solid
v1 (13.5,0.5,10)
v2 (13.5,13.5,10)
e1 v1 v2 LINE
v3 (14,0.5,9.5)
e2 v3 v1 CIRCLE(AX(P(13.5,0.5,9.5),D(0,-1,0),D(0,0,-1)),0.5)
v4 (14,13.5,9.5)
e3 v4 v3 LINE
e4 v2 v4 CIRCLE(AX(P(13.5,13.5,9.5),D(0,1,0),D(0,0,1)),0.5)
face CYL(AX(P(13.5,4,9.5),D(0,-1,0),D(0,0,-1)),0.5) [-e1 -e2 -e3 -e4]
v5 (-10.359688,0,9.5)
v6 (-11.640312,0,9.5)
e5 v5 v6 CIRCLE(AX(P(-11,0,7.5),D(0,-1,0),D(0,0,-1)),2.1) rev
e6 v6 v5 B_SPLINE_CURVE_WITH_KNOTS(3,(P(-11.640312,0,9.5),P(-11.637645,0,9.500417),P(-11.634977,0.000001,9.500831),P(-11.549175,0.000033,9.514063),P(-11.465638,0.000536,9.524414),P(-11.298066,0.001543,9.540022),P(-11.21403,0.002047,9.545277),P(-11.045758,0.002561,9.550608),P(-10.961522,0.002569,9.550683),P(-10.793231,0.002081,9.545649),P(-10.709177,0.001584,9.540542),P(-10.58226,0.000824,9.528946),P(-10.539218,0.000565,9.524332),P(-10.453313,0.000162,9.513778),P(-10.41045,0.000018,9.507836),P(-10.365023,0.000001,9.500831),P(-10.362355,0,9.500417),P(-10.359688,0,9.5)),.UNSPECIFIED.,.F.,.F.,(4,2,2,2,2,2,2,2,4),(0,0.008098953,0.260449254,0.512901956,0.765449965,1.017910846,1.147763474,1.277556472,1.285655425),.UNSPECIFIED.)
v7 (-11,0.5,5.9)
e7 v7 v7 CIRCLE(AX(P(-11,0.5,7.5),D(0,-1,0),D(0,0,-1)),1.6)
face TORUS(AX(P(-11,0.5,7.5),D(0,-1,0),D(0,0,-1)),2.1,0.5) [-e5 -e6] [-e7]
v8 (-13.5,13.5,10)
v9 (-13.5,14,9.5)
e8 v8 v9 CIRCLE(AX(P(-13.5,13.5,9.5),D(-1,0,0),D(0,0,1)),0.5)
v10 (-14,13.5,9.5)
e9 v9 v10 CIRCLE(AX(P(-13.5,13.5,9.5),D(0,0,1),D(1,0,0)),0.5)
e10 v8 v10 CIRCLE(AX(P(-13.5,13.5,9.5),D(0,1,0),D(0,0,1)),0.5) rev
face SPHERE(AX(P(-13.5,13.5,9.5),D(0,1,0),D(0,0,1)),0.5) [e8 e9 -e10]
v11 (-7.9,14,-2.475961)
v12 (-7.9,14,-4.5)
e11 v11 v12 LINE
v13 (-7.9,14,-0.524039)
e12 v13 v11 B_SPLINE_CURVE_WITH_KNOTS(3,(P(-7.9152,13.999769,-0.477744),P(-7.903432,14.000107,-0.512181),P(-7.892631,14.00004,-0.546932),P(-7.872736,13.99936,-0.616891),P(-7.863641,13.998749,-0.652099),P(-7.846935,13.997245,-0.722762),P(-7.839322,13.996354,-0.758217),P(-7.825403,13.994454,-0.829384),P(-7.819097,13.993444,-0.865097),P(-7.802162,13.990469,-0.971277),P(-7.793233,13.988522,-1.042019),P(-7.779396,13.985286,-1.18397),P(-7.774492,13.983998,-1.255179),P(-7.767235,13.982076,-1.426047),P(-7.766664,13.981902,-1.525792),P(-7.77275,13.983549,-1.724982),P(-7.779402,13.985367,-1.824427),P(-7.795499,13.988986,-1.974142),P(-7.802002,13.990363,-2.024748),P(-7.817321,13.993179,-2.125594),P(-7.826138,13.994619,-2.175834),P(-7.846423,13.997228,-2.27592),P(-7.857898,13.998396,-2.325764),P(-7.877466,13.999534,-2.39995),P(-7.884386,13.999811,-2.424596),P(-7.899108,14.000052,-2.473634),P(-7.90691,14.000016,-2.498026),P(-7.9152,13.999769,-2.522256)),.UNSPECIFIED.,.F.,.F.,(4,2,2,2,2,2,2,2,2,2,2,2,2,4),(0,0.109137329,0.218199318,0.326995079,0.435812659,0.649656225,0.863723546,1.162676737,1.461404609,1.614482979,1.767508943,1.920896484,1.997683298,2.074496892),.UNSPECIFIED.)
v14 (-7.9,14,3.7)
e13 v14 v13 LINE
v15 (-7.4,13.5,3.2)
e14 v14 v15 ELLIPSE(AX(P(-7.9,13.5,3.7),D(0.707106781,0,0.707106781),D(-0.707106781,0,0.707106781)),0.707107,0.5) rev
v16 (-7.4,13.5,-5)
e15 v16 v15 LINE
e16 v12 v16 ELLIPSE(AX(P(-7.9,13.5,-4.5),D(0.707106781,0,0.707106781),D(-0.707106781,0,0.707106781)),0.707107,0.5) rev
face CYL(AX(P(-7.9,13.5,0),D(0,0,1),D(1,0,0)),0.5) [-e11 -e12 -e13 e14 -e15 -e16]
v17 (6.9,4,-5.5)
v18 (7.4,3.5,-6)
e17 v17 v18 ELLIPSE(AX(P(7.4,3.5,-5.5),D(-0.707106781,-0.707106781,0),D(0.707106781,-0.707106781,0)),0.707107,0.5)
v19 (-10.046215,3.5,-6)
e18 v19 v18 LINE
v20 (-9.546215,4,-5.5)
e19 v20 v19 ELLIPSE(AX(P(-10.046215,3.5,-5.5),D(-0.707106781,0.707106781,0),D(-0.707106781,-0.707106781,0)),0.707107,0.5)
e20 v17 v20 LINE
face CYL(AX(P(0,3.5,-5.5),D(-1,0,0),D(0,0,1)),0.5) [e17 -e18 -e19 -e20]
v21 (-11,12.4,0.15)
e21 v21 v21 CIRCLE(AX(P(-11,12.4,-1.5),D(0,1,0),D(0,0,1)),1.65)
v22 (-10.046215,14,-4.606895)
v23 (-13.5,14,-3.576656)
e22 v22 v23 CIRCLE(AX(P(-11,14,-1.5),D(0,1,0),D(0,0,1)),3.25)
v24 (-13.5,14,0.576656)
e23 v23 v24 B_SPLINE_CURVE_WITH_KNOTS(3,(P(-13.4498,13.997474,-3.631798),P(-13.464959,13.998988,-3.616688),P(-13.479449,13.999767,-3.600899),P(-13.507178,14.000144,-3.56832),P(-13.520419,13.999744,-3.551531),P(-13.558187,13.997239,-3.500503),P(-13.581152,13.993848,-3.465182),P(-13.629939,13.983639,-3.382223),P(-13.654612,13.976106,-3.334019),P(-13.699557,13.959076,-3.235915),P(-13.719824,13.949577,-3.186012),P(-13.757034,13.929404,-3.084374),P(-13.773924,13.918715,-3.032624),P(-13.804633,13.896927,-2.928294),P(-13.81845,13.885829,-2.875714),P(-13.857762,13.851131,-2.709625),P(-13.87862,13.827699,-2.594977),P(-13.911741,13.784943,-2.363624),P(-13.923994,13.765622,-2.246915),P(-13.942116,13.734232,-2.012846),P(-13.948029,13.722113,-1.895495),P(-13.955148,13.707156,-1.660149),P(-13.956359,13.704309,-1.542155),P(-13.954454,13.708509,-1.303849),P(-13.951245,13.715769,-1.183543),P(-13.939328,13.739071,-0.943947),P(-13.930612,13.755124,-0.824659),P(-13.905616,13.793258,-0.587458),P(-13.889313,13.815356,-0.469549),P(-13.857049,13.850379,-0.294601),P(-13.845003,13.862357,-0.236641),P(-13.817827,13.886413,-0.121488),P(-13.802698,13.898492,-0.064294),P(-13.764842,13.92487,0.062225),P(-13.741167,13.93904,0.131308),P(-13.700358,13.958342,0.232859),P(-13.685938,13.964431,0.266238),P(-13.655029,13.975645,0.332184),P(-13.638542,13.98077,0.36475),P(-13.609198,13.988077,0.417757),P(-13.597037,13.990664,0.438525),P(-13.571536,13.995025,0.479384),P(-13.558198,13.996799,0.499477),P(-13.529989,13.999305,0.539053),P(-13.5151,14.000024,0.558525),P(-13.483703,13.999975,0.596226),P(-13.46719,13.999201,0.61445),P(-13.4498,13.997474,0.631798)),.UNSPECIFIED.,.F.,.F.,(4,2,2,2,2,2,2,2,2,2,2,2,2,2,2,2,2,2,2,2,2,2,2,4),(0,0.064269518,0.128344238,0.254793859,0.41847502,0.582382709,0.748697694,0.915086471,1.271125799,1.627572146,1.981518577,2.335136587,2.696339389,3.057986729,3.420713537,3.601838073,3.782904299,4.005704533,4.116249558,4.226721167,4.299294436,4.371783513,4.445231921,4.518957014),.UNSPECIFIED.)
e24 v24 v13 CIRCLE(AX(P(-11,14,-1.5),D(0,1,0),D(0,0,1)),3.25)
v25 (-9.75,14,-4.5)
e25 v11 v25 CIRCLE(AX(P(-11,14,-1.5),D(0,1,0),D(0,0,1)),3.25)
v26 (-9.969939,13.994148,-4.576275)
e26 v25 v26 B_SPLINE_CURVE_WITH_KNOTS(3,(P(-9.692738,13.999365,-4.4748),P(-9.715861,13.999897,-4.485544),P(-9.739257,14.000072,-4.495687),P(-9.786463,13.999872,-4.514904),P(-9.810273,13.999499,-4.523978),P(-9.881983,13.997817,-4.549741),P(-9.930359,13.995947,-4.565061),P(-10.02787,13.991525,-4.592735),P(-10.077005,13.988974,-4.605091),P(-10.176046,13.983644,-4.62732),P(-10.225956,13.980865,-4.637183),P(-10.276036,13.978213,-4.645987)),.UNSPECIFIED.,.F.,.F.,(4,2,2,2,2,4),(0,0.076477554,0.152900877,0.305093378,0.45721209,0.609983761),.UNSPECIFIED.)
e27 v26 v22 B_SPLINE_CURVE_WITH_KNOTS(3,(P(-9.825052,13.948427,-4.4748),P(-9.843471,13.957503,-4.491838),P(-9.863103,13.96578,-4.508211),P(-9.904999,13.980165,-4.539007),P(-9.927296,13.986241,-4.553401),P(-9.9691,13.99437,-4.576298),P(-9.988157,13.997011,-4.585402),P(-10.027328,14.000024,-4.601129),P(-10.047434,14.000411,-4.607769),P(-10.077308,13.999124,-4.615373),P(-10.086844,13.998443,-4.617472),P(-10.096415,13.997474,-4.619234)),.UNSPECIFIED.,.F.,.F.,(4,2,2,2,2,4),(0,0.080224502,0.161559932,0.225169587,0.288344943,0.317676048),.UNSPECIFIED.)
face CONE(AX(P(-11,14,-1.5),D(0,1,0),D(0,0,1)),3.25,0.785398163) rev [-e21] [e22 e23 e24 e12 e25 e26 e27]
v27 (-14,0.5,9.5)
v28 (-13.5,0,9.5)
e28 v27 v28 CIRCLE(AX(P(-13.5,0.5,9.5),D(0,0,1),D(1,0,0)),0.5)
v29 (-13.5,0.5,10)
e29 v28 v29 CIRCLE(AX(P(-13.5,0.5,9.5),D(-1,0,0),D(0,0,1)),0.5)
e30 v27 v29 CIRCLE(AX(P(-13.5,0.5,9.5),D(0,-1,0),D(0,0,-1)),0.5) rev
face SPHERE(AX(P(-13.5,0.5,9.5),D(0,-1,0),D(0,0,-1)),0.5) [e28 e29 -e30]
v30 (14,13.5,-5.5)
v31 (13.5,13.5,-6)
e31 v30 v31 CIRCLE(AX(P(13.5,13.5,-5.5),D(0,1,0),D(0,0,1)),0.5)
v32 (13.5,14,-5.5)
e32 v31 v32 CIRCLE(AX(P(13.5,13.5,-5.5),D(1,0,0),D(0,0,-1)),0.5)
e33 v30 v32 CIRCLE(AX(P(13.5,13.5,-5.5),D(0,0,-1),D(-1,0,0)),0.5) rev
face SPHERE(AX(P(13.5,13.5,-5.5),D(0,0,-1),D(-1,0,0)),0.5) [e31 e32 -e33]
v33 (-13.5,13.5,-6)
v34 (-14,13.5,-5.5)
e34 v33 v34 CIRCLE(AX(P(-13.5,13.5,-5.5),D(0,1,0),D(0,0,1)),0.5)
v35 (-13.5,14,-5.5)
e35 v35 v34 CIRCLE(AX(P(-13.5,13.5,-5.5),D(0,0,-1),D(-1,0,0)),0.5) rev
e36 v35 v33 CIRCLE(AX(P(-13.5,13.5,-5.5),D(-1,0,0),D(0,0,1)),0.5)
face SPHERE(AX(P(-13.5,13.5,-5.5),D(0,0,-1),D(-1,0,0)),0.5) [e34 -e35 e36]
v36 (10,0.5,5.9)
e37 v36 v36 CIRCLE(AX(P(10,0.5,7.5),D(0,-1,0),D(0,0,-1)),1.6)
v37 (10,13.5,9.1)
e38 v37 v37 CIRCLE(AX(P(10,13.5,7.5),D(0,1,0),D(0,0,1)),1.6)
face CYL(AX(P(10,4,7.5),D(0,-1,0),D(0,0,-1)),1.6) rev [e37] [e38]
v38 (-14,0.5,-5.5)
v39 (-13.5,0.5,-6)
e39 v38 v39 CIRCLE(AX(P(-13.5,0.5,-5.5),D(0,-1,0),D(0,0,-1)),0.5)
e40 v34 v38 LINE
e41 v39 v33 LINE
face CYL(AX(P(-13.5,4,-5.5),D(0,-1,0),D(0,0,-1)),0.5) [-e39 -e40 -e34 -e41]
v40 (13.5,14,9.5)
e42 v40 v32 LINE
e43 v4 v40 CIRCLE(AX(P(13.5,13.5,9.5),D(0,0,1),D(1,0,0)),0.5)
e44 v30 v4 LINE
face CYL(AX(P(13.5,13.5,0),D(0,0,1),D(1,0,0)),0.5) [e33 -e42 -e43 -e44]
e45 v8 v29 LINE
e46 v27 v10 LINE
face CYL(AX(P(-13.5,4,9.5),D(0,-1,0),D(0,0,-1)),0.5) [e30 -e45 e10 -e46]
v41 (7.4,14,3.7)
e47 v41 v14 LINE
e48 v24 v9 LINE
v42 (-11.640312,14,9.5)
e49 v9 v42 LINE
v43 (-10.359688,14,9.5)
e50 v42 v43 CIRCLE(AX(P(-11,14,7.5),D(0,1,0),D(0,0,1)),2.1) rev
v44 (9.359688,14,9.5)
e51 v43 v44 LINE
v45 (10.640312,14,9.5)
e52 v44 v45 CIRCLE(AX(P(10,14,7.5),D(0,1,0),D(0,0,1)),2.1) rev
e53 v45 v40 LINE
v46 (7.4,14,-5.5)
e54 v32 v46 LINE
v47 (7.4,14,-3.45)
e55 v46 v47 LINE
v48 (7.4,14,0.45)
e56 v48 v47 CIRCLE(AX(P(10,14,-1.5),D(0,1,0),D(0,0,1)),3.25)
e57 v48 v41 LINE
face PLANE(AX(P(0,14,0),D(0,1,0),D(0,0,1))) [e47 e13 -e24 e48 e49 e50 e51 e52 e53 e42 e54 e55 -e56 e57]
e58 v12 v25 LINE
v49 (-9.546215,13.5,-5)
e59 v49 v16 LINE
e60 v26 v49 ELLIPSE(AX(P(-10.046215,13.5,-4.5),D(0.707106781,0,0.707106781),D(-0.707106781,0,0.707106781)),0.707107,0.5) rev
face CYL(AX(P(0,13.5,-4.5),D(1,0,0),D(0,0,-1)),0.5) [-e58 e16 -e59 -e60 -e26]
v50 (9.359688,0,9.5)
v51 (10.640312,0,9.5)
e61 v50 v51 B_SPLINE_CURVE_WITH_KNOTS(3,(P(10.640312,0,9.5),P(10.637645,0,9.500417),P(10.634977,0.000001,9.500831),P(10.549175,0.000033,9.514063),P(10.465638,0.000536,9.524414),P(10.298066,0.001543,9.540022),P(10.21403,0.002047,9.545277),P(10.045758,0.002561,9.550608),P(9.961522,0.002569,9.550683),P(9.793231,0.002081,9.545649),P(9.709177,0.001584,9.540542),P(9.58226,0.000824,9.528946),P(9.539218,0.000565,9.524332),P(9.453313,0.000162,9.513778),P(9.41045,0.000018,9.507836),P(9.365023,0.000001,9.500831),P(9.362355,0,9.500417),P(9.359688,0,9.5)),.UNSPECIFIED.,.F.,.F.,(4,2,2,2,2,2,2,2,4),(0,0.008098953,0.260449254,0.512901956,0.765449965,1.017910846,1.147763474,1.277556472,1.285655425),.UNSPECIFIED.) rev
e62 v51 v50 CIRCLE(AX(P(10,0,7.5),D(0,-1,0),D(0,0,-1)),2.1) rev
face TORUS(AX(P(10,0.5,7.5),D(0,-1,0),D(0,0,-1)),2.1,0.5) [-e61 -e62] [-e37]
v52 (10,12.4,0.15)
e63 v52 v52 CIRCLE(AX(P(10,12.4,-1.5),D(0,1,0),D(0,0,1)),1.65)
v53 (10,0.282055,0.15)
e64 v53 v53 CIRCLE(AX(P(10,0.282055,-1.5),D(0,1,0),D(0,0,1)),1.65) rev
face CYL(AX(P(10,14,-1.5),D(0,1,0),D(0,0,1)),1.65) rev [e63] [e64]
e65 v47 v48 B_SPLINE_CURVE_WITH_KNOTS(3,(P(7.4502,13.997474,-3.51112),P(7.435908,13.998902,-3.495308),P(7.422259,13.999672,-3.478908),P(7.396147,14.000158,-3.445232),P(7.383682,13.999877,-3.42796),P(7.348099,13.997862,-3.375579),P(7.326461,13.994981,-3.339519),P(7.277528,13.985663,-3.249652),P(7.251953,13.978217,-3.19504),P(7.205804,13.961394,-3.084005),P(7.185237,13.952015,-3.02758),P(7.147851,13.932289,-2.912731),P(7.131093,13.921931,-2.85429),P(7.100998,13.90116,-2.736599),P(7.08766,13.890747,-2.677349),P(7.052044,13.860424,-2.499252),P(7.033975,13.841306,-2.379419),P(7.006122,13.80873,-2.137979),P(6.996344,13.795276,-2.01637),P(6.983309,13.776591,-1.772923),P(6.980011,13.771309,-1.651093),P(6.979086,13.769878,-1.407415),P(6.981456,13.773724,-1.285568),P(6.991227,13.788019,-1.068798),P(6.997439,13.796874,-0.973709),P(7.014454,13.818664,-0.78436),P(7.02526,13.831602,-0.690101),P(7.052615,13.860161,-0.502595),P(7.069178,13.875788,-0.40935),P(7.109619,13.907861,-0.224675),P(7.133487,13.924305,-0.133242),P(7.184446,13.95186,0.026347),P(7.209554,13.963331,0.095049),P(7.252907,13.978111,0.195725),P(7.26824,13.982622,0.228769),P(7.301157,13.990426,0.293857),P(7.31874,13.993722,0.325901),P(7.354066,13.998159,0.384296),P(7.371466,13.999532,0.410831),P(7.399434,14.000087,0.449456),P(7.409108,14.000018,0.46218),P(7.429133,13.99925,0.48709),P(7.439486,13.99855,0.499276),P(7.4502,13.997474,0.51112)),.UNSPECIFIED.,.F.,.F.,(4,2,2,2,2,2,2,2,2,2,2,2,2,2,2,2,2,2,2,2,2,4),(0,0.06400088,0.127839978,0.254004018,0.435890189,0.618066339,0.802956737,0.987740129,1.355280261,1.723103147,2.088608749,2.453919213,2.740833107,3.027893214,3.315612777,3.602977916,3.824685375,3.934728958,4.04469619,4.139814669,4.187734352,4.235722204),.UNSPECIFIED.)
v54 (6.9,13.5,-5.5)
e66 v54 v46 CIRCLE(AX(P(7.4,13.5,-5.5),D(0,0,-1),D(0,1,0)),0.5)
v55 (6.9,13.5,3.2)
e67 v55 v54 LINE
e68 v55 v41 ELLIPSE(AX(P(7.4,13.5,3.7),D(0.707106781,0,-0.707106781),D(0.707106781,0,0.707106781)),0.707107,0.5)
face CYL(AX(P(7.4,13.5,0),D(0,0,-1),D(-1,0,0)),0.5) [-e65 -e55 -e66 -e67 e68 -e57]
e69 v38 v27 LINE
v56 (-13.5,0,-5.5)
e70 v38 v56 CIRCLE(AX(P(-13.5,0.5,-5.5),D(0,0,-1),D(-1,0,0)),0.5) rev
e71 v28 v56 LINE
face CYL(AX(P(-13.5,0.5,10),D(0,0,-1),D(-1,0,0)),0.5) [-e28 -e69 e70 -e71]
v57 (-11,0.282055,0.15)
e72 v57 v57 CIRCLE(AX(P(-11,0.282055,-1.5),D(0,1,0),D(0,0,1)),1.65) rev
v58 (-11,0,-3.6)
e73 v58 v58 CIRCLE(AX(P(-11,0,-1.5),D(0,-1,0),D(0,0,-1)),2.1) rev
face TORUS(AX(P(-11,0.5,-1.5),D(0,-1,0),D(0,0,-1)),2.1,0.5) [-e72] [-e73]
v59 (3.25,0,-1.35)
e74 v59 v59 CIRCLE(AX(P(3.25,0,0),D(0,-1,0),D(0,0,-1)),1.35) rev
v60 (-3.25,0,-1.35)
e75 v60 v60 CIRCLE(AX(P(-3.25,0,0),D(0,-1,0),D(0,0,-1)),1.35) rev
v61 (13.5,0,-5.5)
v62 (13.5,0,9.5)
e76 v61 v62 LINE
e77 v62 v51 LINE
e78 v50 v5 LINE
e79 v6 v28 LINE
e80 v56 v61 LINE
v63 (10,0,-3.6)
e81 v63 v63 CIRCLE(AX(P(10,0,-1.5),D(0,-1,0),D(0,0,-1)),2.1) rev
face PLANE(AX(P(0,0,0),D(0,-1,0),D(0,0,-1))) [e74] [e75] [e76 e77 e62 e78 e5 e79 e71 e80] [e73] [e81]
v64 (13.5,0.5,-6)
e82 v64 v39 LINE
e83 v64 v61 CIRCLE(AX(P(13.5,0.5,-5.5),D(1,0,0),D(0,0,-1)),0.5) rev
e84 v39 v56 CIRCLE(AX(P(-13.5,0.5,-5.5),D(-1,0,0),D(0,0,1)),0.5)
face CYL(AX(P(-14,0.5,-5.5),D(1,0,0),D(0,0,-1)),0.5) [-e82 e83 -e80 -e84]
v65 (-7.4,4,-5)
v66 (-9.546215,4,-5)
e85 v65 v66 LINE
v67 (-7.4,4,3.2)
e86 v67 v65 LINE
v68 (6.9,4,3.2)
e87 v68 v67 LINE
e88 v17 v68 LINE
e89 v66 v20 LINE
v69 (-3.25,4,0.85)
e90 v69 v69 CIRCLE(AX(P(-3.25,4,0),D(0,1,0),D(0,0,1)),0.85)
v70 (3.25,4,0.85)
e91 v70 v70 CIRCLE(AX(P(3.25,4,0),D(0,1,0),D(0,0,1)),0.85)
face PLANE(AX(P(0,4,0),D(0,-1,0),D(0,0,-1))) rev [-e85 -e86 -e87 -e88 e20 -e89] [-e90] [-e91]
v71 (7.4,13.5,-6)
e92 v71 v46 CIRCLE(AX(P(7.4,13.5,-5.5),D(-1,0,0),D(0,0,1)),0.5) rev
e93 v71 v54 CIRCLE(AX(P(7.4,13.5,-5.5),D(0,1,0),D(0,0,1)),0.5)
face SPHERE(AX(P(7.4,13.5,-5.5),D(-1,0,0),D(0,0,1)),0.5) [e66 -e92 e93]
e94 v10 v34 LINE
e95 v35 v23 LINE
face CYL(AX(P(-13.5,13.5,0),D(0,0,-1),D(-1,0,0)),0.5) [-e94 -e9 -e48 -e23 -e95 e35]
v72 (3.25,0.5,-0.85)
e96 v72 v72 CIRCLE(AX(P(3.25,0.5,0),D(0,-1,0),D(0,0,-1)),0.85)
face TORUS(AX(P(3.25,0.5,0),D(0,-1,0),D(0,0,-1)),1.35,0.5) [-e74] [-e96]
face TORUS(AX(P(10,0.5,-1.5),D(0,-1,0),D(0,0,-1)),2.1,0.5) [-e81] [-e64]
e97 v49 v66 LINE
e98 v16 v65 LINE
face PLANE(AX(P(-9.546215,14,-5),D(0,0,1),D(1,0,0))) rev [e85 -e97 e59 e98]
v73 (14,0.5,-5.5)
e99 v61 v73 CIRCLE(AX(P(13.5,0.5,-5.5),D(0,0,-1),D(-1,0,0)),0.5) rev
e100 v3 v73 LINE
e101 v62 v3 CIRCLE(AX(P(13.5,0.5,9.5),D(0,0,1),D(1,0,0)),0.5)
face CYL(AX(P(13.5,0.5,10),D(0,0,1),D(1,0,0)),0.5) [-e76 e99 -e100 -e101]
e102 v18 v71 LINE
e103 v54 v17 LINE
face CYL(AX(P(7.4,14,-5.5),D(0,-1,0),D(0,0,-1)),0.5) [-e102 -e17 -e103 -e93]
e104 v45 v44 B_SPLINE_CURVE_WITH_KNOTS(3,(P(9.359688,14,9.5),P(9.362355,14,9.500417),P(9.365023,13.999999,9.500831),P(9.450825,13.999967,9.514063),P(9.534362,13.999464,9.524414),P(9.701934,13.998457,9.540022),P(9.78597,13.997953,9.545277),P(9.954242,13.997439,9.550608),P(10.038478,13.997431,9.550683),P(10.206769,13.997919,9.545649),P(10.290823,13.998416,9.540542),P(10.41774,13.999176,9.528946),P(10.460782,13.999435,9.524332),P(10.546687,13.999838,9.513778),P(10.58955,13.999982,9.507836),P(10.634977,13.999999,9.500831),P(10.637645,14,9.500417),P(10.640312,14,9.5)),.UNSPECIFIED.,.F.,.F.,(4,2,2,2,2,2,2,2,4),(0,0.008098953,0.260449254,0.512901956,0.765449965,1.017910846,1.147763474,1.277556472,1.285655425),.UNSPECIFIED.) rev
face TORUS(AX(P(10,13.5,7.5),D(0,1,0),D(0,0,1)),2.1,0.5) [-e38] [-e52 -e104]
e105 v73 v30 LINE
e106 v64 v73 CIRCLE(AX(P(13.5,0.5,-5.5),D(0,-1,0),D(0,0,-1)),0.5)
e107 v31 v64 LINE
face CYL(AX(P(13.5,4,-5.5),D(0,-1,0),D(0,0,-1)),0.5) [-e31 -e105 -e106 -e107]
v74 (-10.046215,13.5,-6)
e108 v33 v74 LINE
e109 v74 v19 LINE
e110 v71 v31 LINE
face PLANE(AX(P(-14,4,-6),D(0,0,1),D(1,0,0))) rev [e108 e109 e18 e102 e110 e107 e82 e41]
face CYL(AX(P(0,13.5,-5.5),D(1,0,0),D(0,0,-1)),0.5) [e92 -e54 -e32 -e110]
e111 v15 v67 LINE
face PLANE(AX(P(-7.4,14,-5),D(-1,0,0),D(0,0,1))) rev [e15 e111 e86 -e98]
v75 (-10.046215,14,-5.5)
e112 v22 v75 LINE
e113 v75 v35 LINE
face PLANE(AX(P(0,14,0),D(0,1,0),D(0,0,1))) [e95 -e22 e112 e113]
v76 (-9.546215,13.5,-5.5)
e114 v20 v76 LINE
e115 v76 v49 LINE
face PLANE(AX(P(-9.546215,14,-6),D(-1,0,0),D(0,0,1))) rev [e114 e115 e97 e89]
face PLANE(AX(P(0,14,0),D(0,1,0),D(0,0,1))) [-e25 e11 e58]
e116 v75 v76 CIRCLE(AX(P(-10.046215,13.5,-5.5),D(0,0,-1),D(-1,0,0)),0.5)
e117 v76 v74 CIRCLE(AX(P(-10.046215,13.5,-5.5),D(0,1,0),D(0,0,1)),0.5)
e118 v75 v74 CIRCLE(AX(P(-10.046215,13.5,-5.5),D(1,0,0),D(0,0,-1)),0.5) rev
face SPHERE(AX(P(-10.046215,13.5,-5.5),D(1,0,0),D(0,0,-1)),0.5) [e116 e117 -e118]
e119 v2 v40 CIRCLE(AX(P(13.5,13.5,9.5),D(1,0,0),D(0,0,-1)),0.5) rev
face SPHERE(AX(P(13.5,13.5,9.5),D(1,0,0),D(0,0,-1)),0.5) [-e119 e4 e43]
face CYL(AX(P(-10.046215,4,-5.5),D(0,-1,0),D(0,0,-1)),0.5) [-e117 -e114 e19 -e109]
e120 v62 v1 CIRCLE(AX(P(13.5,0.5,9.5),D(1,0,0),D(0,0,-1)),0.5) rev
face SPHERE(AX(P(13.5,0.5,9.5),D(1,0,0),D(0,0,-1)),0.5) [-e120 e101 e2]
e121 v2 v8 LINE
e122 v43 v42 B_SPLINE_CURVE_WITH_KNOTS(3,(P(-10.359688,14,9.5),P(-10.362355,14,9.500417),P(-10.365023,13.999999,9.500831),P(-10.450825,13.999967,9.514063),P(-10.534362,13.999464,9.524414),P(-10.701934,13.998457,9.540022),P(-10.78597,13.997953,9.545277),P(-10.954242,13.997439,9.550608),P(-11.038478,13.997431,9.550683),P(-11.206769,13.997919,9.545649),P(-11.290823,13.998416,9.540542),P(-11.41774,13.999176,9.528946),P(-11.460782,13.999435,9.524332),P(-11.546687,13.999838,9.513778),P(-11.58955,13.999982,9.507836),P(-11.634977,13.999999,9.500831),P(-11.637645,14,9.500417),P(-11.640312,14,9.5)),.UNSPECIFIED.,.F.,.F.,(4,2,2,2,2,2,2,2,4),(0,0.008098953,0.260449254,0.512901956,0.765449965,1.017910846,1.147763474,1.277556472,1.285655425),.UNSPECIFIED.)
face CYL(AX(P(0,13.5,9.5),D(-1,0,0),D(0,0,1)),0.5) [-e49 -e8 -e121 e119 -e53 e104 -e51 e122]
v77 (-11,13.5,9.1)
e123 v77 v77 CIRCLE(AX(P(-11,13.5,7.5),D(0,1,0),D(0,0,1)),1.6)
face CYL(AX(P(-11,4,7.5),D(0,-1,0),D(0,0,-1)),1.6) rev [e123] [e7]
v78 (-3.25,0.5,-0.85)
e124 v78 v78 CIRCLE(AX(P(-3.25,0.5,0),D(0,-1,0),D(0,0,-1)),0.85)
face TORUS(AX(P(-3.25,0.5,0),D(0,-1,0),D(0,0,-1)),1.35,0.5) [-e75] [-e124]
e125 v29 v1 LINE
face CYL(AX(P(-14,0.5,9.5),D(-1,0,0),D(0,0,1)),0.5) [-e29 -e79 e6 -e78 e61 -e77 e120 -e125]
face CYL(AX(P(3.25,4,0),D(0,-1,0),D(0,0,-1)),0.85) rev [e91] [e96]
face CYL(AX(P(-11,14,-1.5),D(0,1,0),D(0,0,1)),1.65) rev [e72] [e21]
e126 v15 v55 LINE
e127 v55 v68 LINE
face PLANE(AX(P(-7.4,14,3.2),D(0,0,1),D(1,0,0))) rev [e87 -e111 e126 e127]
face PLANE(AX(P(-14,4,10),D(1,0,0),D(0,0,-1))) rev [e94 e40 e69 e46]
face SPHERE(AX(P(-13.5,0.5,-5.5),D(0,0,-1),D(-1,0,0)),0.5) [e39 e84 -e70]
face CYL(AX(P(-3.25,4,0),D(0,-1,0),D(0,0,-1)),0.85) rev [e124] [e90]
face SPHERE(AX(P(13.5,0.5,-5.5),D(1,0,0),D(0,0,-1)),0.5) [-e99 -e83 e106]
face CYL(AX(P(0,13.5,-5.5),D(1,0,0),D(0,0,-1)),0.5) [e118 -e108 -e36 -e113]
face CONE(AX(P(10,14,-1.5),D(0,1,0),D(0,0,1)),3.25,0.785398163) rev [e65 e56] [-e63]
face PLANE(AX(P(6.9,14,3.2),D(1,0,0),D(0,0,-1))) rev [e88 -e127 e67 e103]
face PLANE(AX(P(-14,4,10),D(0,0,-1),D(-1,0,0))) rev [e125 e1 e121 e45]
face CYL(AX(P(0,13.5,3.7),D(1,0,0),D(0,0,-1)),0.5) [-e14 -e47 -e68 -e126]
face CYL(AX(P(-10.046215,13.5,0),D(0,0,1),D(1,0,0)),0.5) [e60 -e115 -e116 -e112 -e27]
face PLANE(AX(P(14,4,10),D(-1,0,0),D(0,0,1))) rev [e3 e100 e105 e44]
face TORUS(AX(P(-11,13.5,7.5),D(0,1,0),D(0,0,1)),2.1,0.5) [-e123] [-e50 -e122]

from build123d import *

# Parameters (mm, degrees)
SKETCH1_W                                       = 28
SKETCH1_H                                       = 16
SKETCH1_R                                       = 0.85
SKETCH1_R_2                                     = 1.6
BOSS_EXTRUDE1_DEPTH                             = 4
SKETCH2_R                                       = 1.6
BOSS_EXTRUDE2_DEPTH                             = 10
FILLET1_R                                       = 0.5
CSK_FOR_M5_FLAT_HEAD_MACHINE_SCREW1_D           = 3.3
CSK_FOR_M5_FLAT_HEAD_MACHINE_SCREW1_CSINK_D     = 6.5
CSK_FOR_M5_FLAT_HEAD_MACHINE_SCREW1_CSINK_ANGLE = 90


with BuildPart() as part:
    # Sketch1 → Boss-Extrude1 (new body)
    with BuildSketch(Plane(origin=(0, 0, 0), x_dir=(1, 0, 0), z_dir=(0, 1, 0))):
        with Locations((0, -2)):
            Rectangle(SKETCH1_W, SKETCH1_H)
        with Locations(Location((3.25, 0, 0), (0, 0, 270))):
            Circle(SKETCH1_R, mode=Mode.SUBTRACT)
        with Locations(Location((-3.25, 0, 0), (0, 0, 270))):
            Circle(SKETCH1_R, mode=Mode.SUBTRACT)
        with Locations(Location((-11, -7.5, 0), (0, 0, 270))):
            Circle(SKETCH1_R_2, mode=Mode.SUBTRACT)
        with Locations(Location((10, -7.5, 0), (0, 0, 270))):
            Circle(SKETCH1_R_2, mode=Mode.SUBTRACT)
        with Locations(Location((-11, 1.5, 0), (0, 0, 270))):
            Circle(SKETCH1_R_2, mode=Mode.SUBTRACT)
        with Locations(Location((10, 1.5, 0), (0, 0, 270))):
            Circle(SKETCH1_R_2, mode=Mode.SUBTRACT)
    extrude(amount=BOSS_EXTRUDE1_DEPTH)

    # Sketch2 → Boss-Extrude2 (add)
    with BuildSketch(Plane(origin=(0, 4, 0), x_dir=(1, 0, 0), z_dir=(0, 1, 0))):
        Polygon((-9.546214808, 6), (-9.546214808, 5), (-7.4, 5), (-7.4, -3.2), (6.9, -3.2), (6.9, 6), (14, 6), (14, -10), (-14, -10), (-14, 6), align=None)
        with Locations(Location((-11, -7.5, 0), (0, 0, 270))):
            Circle(SKETCH2_R, mode=Mode.SUBTRACT)
        with Locations(Location((10, -7.5, 0), (0, 0, 270))):
            Circle(SKETCH2_R, mode=Mode.SUBTRACT)
        with Locations(Location((10, 1.5, 0), (0, 0, 270))):
            Circle(SKETCH2_R, mode=Mode.SUBTRACT)
        with Locations(Location((-11, 1.5, 0), (0, 0, 270))):
            Circle(SKETCH2_R, mode=Mode.SUBTRACT)
    extrude(amount=BOSS_EXTRUDE2_DEPTH)

    # Fillet1
    # the kernel refuses this fillet: 0.5 mm, written as the material it takes off along each edge
    with BuildSketch(Plane(origin=(-13.5, 13.5, -5.5), x_dir=(-1, 0, 0), z_dir=(0, 1, 0))) as fillet1_piece_1_section:
        Polygon((0, 0), (FILLET1_R, 0), (FILLET1_R, -FILLET1_R), (0, -FILLET1_R), align=None)
    fillet1_piece_1 = extrude(amount=FILLET1_R, mode=Mode.PRIVATE)
    fillet1_piece_1 = fillet1_piece_1 - Plane(origin=(-13.5, 13.5, -5.5), x_dir=(0.7071067811865477, 0, 0.7071067811865475), z_dir=(0, 1, 0)) * Sphere(FILLET1_R, mode=Mode.PRIVATE)
    add(fillet1_piece_1, mode=Mode.SUBTRACT)
    with BuildSketch(Plane(origin=(-10.046214808, 13.5, -5.5), x_dir=(1, 0, 0), z_dir=(0, 1, 0))) as fillet1_piece_2_section:
        Polygon((0, 0), (FILLET1_R, 0), (FILLET1_R, FILLET1_R), (0, FILLET1_R), align=None)
    fillet1_piece_2 = extrude(amount=FILLET1_R, mode=Mode.PRIVATE)
    fillet1_piece_2 = fillet1_piece_2 - Plane(origin=(-10.046214808, 13.5, -5.5), x_dir=(-0.7071067811865475, 0, 0.7071067811865476), z_dir=(0, 1, 0)) * Sphere(FILLET1_R, mode=Mode.PRIVATE)
    add(fillet1_piece_2, mode=Mode.SUBTRACT)
    with BuildSketch(Plane(origin=(-13.5, 13.5, 9.5), x_dir=(-1, 0, 0), z_dir=(0, 1, 0))) as fillet1_piece_3_section:
        Polygon((0, 0), (FILLET1_R, 0), (FILLET1_R, FILLET1_R), (0, FILLET1_R), align=None)
    fillet1_piece_3 = extrude(amount=FILLET1_R, mode=Mode.PRIVATE)
    fillet1_piece_3 = fillet1_piece_3 - Plane(origin=(-13.5, 13.5, 9.5), x_dir=(0.7071067811865475, 0, -0.7071067811865476), z_dir=(0, 1, 0)) * Sphere(FILLET1_R, mode=Mode.PRIVATE)
    add(fillet1_piece_3, mode=Mode.SUBTRACT)
    with BuildSketch(Plane(origin=(13.5, 13.5, 9.5), x_dir=(0, 1, 0), z_dir=(0, 0, 1))) as fillet1_piece_4_section:
        Polygon((0, 0), (FILLET1_R, 0), (FILLET1_R, -FILLET1_R), (0, -FILLET1_R), align=None)
    fillet1_piece_4 = extrude(amount=FILLET1_R, mode=Mode.PRIVATE)
    fillet1_piece_4 = fillet1_piece_4 - Plane(origin=(13.5, 13.5, 9.5), x_dir=(-0.7071067811865475, -0.7071067811865475, 0), z_dir=(0, 0, 1)) * Sphere(FILLET1_R, mode=Mode.PRIVATE)
    add(fillet1_piece_4, mode=Mode.SUBTRACT)
    with BuildSketch(Plane(origin=(13.5, 13.5, -5.5), x_dir=(0, 0, -1), z_dir=(0, 1, 0))) as fillet1_piece_5_section:
        Polygon((0, 0), (FILLET1_R, 0), (FILLET1_R, -FILLET1_R), (0, -FILLET1_R), align=None)
    fillet1_piece_5 = extrude(amount=FILLET1_R, mode=Mode.PRIVATE)
    fillet1_piece_5 = fillet1_piece_5 - Plane(origin=(13.5, 13.5, -5.5), x_dir=(-0.7071067811865474, 0, 0.7071067811865477), z_dir=(0, 1, 0)) * Sphere(FILLET1_R, mode=Mode.PRIVATE)
    add(fillet1_piece_5, mode=Mode.SUBTRACT)
    with BuildSketch(Plane(origin=(7.4, 13.5, -5.5), x_dir=(-1, 0, 0), z_dir=(0, 1, 0))) as fillet1_piece_6_section:
        Polygon((0, 0), (FILLET1_R, 0), (FILLET1_R, -FILLET1_R), (0, -FILLET1_R), align=None)
    fillet1_piece_6 = extrude(amount=FILLET1_R, mode=Mode.PRIVATE)
    fillet1_piece_6 = fillet1_piece_6 - Plane(origin=(7.4, 13.5, -5.5), x_dir=(0.7071067811865477, 0, 0.7071067811865475), z_dir=(0, 1, 0)) * Sphere(FILLET1_R, mode=Mode.PRIVATE)
    add(fillet1_piece_6, mode=Mode.SUBTRACT)
    with BuildSketch(Plane(origin=(-13.5, 0.5, 9.5), x_dir=(0, -1, 0), z_dir=(0, 0, 1))) as fillet1_piece_7_section:
        Polygon((0, 0), (FILLET1_R, 0), (FILLET1_R, -FILLET1_R), (0, -FILLET1_R), align=None)
    fillet1_piece_7 = extrude(amount=FILLET1_R, mode=Mode.PRIVATE)
    fillet1_piece_7 = fillet1_piece_7 - Plane(origin=(-13.5, 0.5, 9.5), x_dir=(0.7071067811865475, 0.7071067811865475, 0), z_dir=(0, 0, 1)) * Sphere(FILLET1_R, mode=Mode.PRIVATE)
    add(fillet1_piece_7, mode=Mode.SUBTRACT)
    with BuildSketch(Plane(origin=(13.5, 0.5, 9.5), x_dir=(0, -1, 0), z_dir=(0, 0, 1))) as fillet1_piece_8_section:
        Polygon((0, 0), (FILLET1_R, 0), (FILLET1_R, FILLET1_R), (0, FILLET1_R), align=None)
    fillet1_piece_8 = extrude(amount=FILLET1_R, mode=Mode.PRIVATE)
    fillet1_piece_8 = fillet1_piece_8 - Plane(origin=(13.5, 0.5, 9.5), x_dir=(-0.7071067811865475, 0.7071067811865475, 0), z_dir=(0, 0, 1)) * Sphere(FILLET1_R, mode=Mode.PRIVATE)
    add(fillet1_piece_8, mode=Mode.SUBTRACT)
    with BuildSketch(Plane(origin=(-13.5, 0.5, -5.5), x_dir=(-1, 0, 0), z_dir=(0, -1, 0))) as fillet1_piece_9_section:
        Polygon((0, 0), (FILLET1_R, 0), (FILLET1_R, FILLET1_R), (0, FILLET1_R), align=None)
    fillet1_piece_9 = extrude(amount=FILLET1_R, mode=Mode.PRIVATE)
    fillet1_piece_9 = fillet1_piece_9 - Plane(origin=(-13.5, 0.5, -5.5), x_dir=(0.7071067811865477, 0, 0.7071067811865475), z_dir=(0, -1, 0)) * Sphere(FILLET1_R, mode=Mode.PRIVATE)
    add(fillet1_piece_9, mode=Mode.SUBTRACT)
    with BuildSketch(Plane(origin=(13.5, 0.5, -5.5), x_dir=(0, 0, -1), z_dir=(0, -1, 0))) as fillet1_piece_10_section:
        Polygon((0, 0), (FILLET1_R, 0), (FILLET1_R, FILLET1_R), (0, FILLET1_R), align=None)
    fillet1_piece_10 = extrude(amount=FILLET1_R, mode=Mode.PRIVATE)
    fillet1_piece_10 = fillet1_piece_10 - Plane(origin=(13.5, 0.5, -5.5), x_dir=(-0.7071067811865474, 0, 0.7071067811865477), z_dir=(0, -1, 0)) * Sphere(FILLET1_R, mode=Mode.PRIVATE)
    add(fillet1_piece_10, mode=Mode.SUBTRACT)
    with BuildSketch(Plane(origin=(3.25, 0, 0), x_dir=(0, 0, 1), z_dir=(-1, 0, 0))) as fillet1_piece_11:
        with BuildLine():
            CenterArc((0.85 + FILLET1_R, FILLET1_R), FILLET1_R, 180, 90)
            Line((0.85, FILLET1_R), (0.85, 0))
            Line((0.85, 0), (0.85 + FILLET1_R, 0))
        make_face()
    revolve(axis=Axis((3.25, 0, 0), (0, 1, 0)), mode=Mode.SUBTRACT)
    with BuildSketch(Plane(origin=(-3.25, 0, 0), x_dir=(0, 0, 1), z_dir=(-1, 0, 0))) as fillet1_piece_12:
        with BuildLine():
            CenterArc((0.85 + FILLET1_R, FILLET1_R), FILLET1_R, 180, 90)
            Line((0.85, FILLET1_R), (0.85, 0))
            Line((0.85, 0), (0.85 + FILLET1_R, 0))
        make_face()
    revolve(axis=Axis((-3.25, 0, 0), (0, 1, 0)), mode=Mode.SUBTRACT)
    with BuildSketch(Plane(origin=(-11, 0, 7.5), x_dir=(0, 0, 1), z_dir=(-1, 0, 0))) as fillet1_piece_13:
        with BuildLine():
            CenterArc((1.6 + FILLET1_R, FILLET1_R), FILLET1_R, 180, 90)
            Line((1.6, FILLET1_R), (1.6, 0))
            Line((1.6, 0), (1.6 + FILLET1_R, 0))
        make_face()
    revolve(axis=Axis((-11, 0, 7.5), (0, 1, 0)), mode=Mode.SUBTRACT)
    with BuildSketch(Plane(origin=(10, 0, 7.5), x_dir=(0, 0, 1), z_dir=(-1, 0, 0))) as fillet1_piece_14:
        with BuildLine():
            CenterArc((1.6 + FILLET1_R, FILLET1_R), FILLET1_R, 180, 90)
            Line((1.6, FILLET1_R), (1.6, 0))
            Line((1.6, 0), (1.6 + FILLET1_R, 0))
        make_face()
    revolve(axis=Axis((10, 0, 7.5), (0, 1, 0)), mode=Mode.SUBTRACT)
    with BuildSketch(Plane(origin=(-11, 0, -1.5), x_dir=(0, 0, 1), z_dir=(-1, 0, 0))) as fillet1_piece_15:
        with BuildLine():
            CenterArc((1.6 + FILLET1_R, FILLET1_R), FILLET1_R, 180, 90)
            Line((1.6, FILLET1_R), (1.6, 0))
            Line((1.6, 0), (1.6 + FILLET1_R, 0))
        make_face()
    revolve(axis=Axis((-11, 0, -1.5), (0, 1, 0)), mode=Mode.SUBTRACT)
    with BuildSketch(Plane(origin=(10, 0, -1.5), x_dir=(0, 0, 1), z_dir=(-1, 0, 0))) as fillet1_piece_16:
        with BuildLine():
            CenterArc((1.6 + FILLET1_R, FILLET1_R), FILLET1_R, 180, 90)
            Line((1.6, FILLET1_R), (1.6, 0))
            Line((1.6, 0), (1.6 + FILLET1_R, 0))
        make_face()
    revolve(axis=Axis((10, 0, -1.5), (0, 1, 0)), mode=Mode.SUBTRACT)
    with BuildSketch(Plane(origin=(6.9, 4, -6), x_dir=(0, 0, 1), z_dir=(-1, 0, 0))) as fillet1_piece_17:
        with BuildLine():
            CenterArc((FILLET1_R, -FILLET1_R), FILLET1_R, 90, 90)
            Line((0, -FILLET1_R), (0, 0))
            Line((0, 0), (FILLET1_R, 0))
        make_face()
    extrude(amount=16.446214808, mode=Mode.SUBTRACT)
    with BuildSketch(Plane(origin=(-13.5, 14, -6), x_dir=(0, -1, 0), z_dir=(1, 0, 0))) as fillet1_piece_18:
        with BuildLine():
            CenterArc((FILLET1_R, -FILLET1_R), FILLET1_R, 90, 90)
            Line((0, -FILLET1_R), (0, 0))
            Line((0, 0), (FILLET1_R, 0))
        make_face()
    extrude(amount=3.453785192, mode=Mode.SUBTRACT)
    with BuildSketch(Plane(origin=(-14, 14, 9.5), x_dir=(1, 0, 0), z_dir=(0, 0, -1)), Plane(origin=(-14, 0, -5.5), x_dir=(1, 0, 0), z_dir=(0, 0, 1)), Plane(origin=(14, 0, 9.5), x_dir=(-1, 0, 0), z_dir=(0, 0, -1))) as fillet1_piece_19:
        with BuildLine():
            CenterArc((FILLET1_R, FILLET1_R), FILLET1_R, 180, 90)
            Line((0, FILLET1_R), (0, 0))
            Line((0, 0), (FILLET1_R, 0))
        make_face()
    extrude(amount=15, mode=Mode.SUBTRACT)
    with BuildSketch(Plane(origin=(13.5, 14, 10), x_dir=(0, -1, 0), z_dir=(-1, 0, 0)), Plane(origin=(-13.5, 0, 10), x_dir=(0, 1, 0), z_dir=(1, 0, 0))) as fillet1_piece_20:
        with BuildLine():
            CenterArc((FILLET1_R, -FILLET1_R), FILLET1_R, 90, 90)
            Line((0, -FILLET1_R), (0, 0))
            Line((0, 0), (FILLET1_R, 0))
        make_face()
    extrude(amount=27, mode=Mode.SUBTRACT)
    with BuildSketch(Plane(origin=(14, 14, -5.5), x_dir=(0, -1, 0), z_dir=(0, 0, 1))) as fillet1_piece_21:
        with BuildLine():
            CenterArc((FILLET1_R, -FILLET1_R), FILLET1_R, 90, 90)
            Line((0, -FILLET1_R), (0, 0))
            Line((0, 0), (FILLET1_R, 0))
        make_face()
    extrude(amount=15, mode=Mode.SUBTRACT)
    with BuildSketch(Plane(origin=(7.4, 14, -6), x_dir=(0, -1, 0), z_dir=(1, 0, 0))) as fillet1_piece_22:
        with BuildLine():
            CenterArc((FILLET1_R, -FILLET1_R), FILLET1_R, 90, 90)
            Line((0, -FILLET1_R), (0, 0))
            Line((0, 0), (FILLET1_R, 0))
        make_face()
    extrude(amount=6.1, mode=Mode.SUBTRACT)
    with BuildSketch(Plane(origin=(6.9, 14, 3.2), x_dir=(0, -1, 0), z_dir=(0, 0, -1))) as fillet1_piece_23:
        with BuildLine():
            CenterArc((FILLET1_R, -FILLET1_R), FILLET1_R, 90, 90)
            Line((0, -FILLET1_R), (0, 0))
            Line((0, 0), (FILLET1_R, 0))
        make_face()
    extrude(amount=8.7, mode=Mode.SUBTRACT)
    with BuildSketch(Plane(origin=(-7.4, 14, 3.2), x_dir=(0, -1, 0), z_dir=(1, 0, 0))) as fillet1_piece_24:
        with BuildLine():
            CenterArc((FILLET1_R, -FILLET1_R), FILLET1_R, 90, 90)
            Line((0, -FILLET1_R), (0, 0))
            Line((0, 0), (FILLET1_R, 0))
        make_face()
    extrude(amount=14.3, mode=Mode.SUBTRACT)
    with BuildSketch(Plane(origin=(-7.4, 14, -6.25), x_dir=(0, -1, 0), z_dir=(0, 0, 1))) as fillet1_piece_25:
        with BuildLine():
            CenterArc((FILLET1_R, -FILLET1_R), FILLET1_R, 90, 90)
            Line((0, -FILLET1_R), (0, 0))
            Line((0, 0), (FILLET1_R, 0))
        make_face()
    extrude(amount=9.45, mode=Mode.SUBTRACT)
    with BuildSketch(Plane(origin=(-9.546214808, 14, -5), x_dir=(0, -1, 0), z_dir=(1, 0, 0))) as fillet1_piece_26:
        with BuildLine():
            CenterArc((FILLET1_R, -FILLET1_R), FILLET1_R, 90, 90)
            Line((0, -FILLET1_R), (0, 0))
            Line((0, 0), (FILLET1_R, 0))
        make_face()
    extrude(amount=3.396214808, mode=Mode.SUBTRACT)
    with BuildSketch(Plane(origin=(-9.546214808, 14, -5.5), x_dir=(0, -1, 0), z_dir=(0, 0, 1))) as fillet1_piece_27:
        with BuildLine():
            CenterArc((FILLET1_R, -FILLET1_R), FILLET1_R, 90, 90)
            Line((0, -FILLET1_R), (0, 0))
            Line((0, 0), (FILLET1_R, 0))
        make_face()
    extrude(amount=0.5, mode=Mode.SUBTRACT)
    with BuildSketch(Plane(origin=(-9.546214808, 4, -6), x_dir=(0, 0, 1), z_dir=(0, 1, 0))) as fillet1_piece_28:
        with BuildLine():
            CenterArc((FILLET1_R, -FILLET1_R), FILLET1_R, 90, 90)
            Line((0, -FILLET1_R), (0, 0))
            Line((0, 0), (FILLET1_R, 0))
        make_face()
    extrude(amount=9.5, mode=Mode.SUBTRACT)
    with BuildSketch(Plane(origin=(6.9, 4, -6), x_dir=(0, 0, 1), z_dir=(0, 1, 0))) as fillet1_piece_29:
        with BuildLine():
            CenterArc((FILLET1_R, FILLET1_R), FILLET1_R, 180, 90)
            Line((0, FILLET1_R), (0, 0))
            Line((0, 0), (FILLET1_R, 0))
        make_face()
    extrude(amount=9.5, mode=Mode.SUBTRACT)
    with BuildSketch(Plane(origin=(-11, 14, 7.5), x_dir=(0, 0, 1), z_dir=(-1, 0, 0))) as fillet1_piece_30:
        with BuildLine():
            CenterArc((1.6 + FILLET1_R, -FILLET1_R), FILLET1_R, 90, 90)
            Line((1.6 + FILLET1_R, 0), (1.6, 0))
            Line((1.6, 0), (1.6, -FILLET1_R))
        make_face()
    revolve(axis=Axis((-11, 14, 7.5), (0, 1, 0)), mode=Mode.SUBTRACT)
    with BuildSketch(Plane(origin=(10, 14, 7.5), x_dir=(0, 0, 1), z_dir=(-1, 0, 0))) as fillet1_piece_31:
        with BuildLine():
            CenterArc((1.6 + FILLET1_R, -FILLET1_R), FILLET1_R, 90, 90)
            Line((1.6 + FILLET1_R, 0), (1.6, 0))
            Line((1.6, 0), (1.6, -FILLET1_R))
        make_face()
    revolve(axis=Axis((10, 14, 7.5), (0, 1, 0)), mode=Mode.SUBTRACT)
    with BuildSketch(Plane(origin=(10, 14, -1.5), x_dir=(0, 0, 1), z_dir=(-1, 0, 0))) as fillet1_piece_32:
        with BuildLine():
            CenterArc((1.6 + FILLET1_R, -FILLET1_R), FILLET1_R, 90, 90)
            Line((1.6 + FILLET1_R, 0), (1.6, 0))
            Line((1.6, 0), (1.6, -FILLET1_R))
        make_face()
    revolve(axis=Axis((10, 14, -1.5), (0, 1, 0)), mode=Mode.SUBTRACT)
    with BuildSketch(Plane(origin=(-11, 14, -1.5), x_dir=(0, 0, 1), z_dir=(-1, 0, 0))) as fillet1_piece_33:
        with BuildLine():
            CenterArc((1.6 + FILLET1_R, -FILLET1_R), FILLET1_R, 90, 90)
            Line((1.6 + FILLET1_R, 0), (1.6, 0))
            Line((1.6, 0), (1.6, -FILLET1_R))
        make_face()
    revolve(axis=Axis((-11, 14, -1.5), (0, 1, 0)), mode=Mode.SUBTRACT)
    with BuildSketch(Plane(origin=(13.5, 0, -6), x_dir=(0, 0, 1), z_dir=(-1, 0, 0))) as fillet1_piece_34:
        with BuildLine():
            CenterArc((FILLET1_R, FILLET1_R), FILLET1_R, 180, 90)
            Line((0, FILLET1_R), (0, 0))
            Line((0, 0), (FILLET1_R, 0))
        make_face()
    extrude(amount=27, mode=Mode.SUBTRACT)
    with BuildSketch(Plane(origin=(14, 0.5, 10), x_dir=(-1, 0, 0), z_dir=(0, 1, 0)), Plane(origin=(-14, 13.5, 10), x_dir=(1, 0, 0), z_dir=(0, -1, 0))) as fillet1_piece_35:
        with BuildLine():
            CenterArc((FILLET1_R, -FILLET1_R), FILLET1_R, 90, 90)
            Line((0, -FILLET1_R), (0, 0))
            Line((0, 0), (FILLET1_R, 0))
        make_face()
    extrude(amount=13, mode=Mode.SUBTRACT)
    with BuildSketch(Plane(origin=(-14, 13.5, -6), x_dir=(1, 0, 0), z_dir=(0, -1, 0)), Plane(origin=(14, 0.5, -6), x_dir=(-1, 0, 0), z_dir=(0, 1, 0))) as fillet1_piece_36:
        with BuildLine():
            CenterArc((FILLET1_R, FILLET1_R), FILLET1_R, 180, 90)
            Line((0, FILLET1_R), (0, 0))
            Line((0, 0), (FILLET1_R, 0))
        make_face()
    extrude(amount=13, mode=Mode.SUBTRACT)
    with BuildSketch(Plane(origin=(8.15, 4, -6), x_dir=(0, 0, 1), z_dir=(-1, 0, 0))) as fillet1_piece_37a_section:
        with BuildLine():
            CenterArc((FILLET1_R, -FILLET1_R), FILLET1_R, 90, 90)
            Line((0, -FILLET1_R), (0, 0))
            Line((0, 0), (FILLET1_R, 0))
        make_face()
    fillet1_piece_37a = extrude(amount=17.696214808, mode=Mode.PRIVATE)
    fillet1_piece_37a = split(fillet1_piece_37a, bisect_by=Plane(origin=(6.9, 3.886802443, -5.886802443), z_dir=(1, 0, 0)), keep=Keep.TOP, mode=Mode.PRIVATE)
    with BuildSketch(Plane(origin=(6.9, 2.75, -6), x_dir=(0, 0, 1), z_dir=(0, 1, 0))) as fillet1_piece_37b_section:
        with BuildLine():
            CenterArc((FILLET1_R, FILLET1_R), FILLET1_R, 180, 90)
            Line((0, FILLET1_R), (0, 0))
            Line((0, 0), (FILLET1_R, 0))
        make_face()
    fillet1_piece_37b = extrude(amount=10.75, mode=Mode.PRIVATE)
    fillet1_piece_37b = split(fillet1_piece_37b, bisect_by=Plane(origin=(7.013197557, 4, -5.886802443), z_dir=(0, -1, 0)), keep=Keep.TOP, mode=Mode.PRIVATE)
    fillet1_piece_37 = fillet1_piece_37a & fillet1_piece_37b
    add(fillet1_piece_37, mode=Mode.SUBTRACT)
    with BuildSketch(Plane(origin=(6.9, 4, -6), x_dir=(0, 0, 1), z_dir=(-1, 0, 0))) as fillet1_piece_38a_section:
        with BuildLine():
            CenterArc((FILLET1_R, -FILLET1_R), FILLET1_R, 90, 90)
            Line((0, -FILLET1_R), (0, 0))
            Line((0, 0), (FILLET1_R, 0))
        make_face()
    fillet1_piece_38a = extrude(amount=17.696214808, mode=Mode.PRIVATE)
    fillet1_piece_38a = split(fillet1_piece_38a, bisect_by=Plane(origin=(-9.546214808, 3.886802443, -5.886802443), z_dir=(-1, 0, 0)), keep=Keep.TOP, mode=Mode.PRIVATE)
    with BuildSketch(Plane(origin=(-9.546214808, 2.75, -6), x_dir=(0, 0, 1), z_dir=(0, 1, 0))) as fillet1_piece_38b_section:
        with BuildLine():
            CenterArc((FILLET1_R, -FILLET1_R), FILLET1_R, 90, 90)
            Line((0, -FILLET1_R), (0, 0))
            Line((0, 0), (FILLET1_R, 0))
        make_face()
    fillet1_piece_38b = extrude(amount=10.75, mode=Mode.PRIVATE)
    fillet1_piece_38b = split(fillet1_piece_38b, bisect_by=Plane(origin=(-9.659412365, 4, -5.886802443), z_dir=(0, -1, 0)), keep=Keep.TOP, mode=Mode.PRIVATE)
    fillet1_piece_38 = fillet1_piece_38a & fillet1_piece_38b
    add(fillet1_piece_38, mode=Mode.SUBTRACT)
    with BuildSketch(Plane(origin=(-7.4, 14, 3.2), x_dir=(0, -1, 0), z_dir=(1, 0, 0))) as fillet1_piece_39a_section:
        with BuildLine():
            CenterArc((FILLET1_R, -FILLET1_R), FILLET1_R, 90, 90)
            Line((0, -FILLET1_R), (0, 0))
            Line((0, 0), (FILLET1_R, 0))
        make_face()
    fillet1_piece_39a = extrude(amount=15.55, mode=Mode.PRIVATE)
    fillet1_piece_39a = split(fillet1_piece_39a, bisect_by=Plane(origin=(6.9, 13.886802443, 3.313197557), z_dir=(1, 0, 0)), keep=Keep.TOP, mode=Mode.PRIVATE)
    with BuildSketch(Plane(origin=(6.9, 14, 4.45), x_dir=(0, -1, 0), z_dir=(0, 0, -1))) as fillet1_piece_39b_section:
        with BuildLine():
            CenterArc((FILLET1_R, -FILLET1_R), FILLET1_R, 90, 90)
            Line((0, -FILLET1_R), (0, 0))
            Line((0, 0), (FILLET1_R, 0))
        make_face()
    fillet1_piece_39b = extrude(amount=9.95, mode=Mode.PRIVATE)
    fillet1_piece_39b = split(fillet1_piece_39b, bisect_by=Plane(origin=(7.013197557, 13.886802443, 3.2), z_dir=(0, 0, 1)), keep=Keep.TOP, mode=Mode.PRIVATE)
    fillet1_piece_39 = fillet1_piece_39a & fillet1_piece_39b
    add(fillet1_piece_39, mode=Mode.SUBTRACT)
    with BuildSketch(Plane(origin=(-7.4, 14, -6.25), x_dir=(0, -1, 0), z_dir=(0, 0, 1))) as fillet1_piece_40a_section:
        with BuildLine():
            CenterArc((FILLET1_R, -FILLET1_R), FILLET1_R, 90, 90)
            Line((0, -FILLET1_R), (0, 0))
            Line((0, 0), (FILLET1_R, 0))
        make_face()
    fillet1_piece_40a = extrude(amount=10.7, mode=Mode.PRIVATE)
    fillet1_piece_40a = split(fillet1_piece_40a, bisect_by=Plane(origin=(-7.513197557, 13.886802443, 3.2), z_dir=(0, 0, 1)), keep=Keep.TOP, mode=Mode.PRIVATE)
    with BuildSketch(Plane(origin=(-8.65, 14, 3.2), x_dir=(0, -1, 0), z_dir=(1, 0, 0))) as fillet1_piece_40b_section:
        with BuildLine():
            CenterArc((FILLET1_R, -FILLET1_R), FILLET1_R, 90, 90)
            Line((0, -FILLET1_R), (0, 0))
            Line((0, 0), (FILLET1_R, 0))
        make_face()
    fillet1_piece_40b = extrude(amount=15.55, mode=Mode.PRIVATE)
    fillet1_piece_40b = split(fillet1_piece_40b, bisect_by=Plane(origin=(-7.4, 13.886802443, 3.313197557), z_dir=(-1, 0, 0)), keep=Keep.TOP, mode=Mode.PRIVATE)
    fillet1_piece_40 = fillet1_piece_40a & fillet1_piece_40b
    add(fillet1_piece_40, mode=Mode.SUBTRACT)
    with BuildSketch(Plane(origin=(-9.546214808, 14, -5.5), x_dir=(0, -1, 0), z_dir=(0, 0, 1))) as fillet1_piece_41a_section:
        with BuildLine():
            CenterArc((FILLET1_R, -FILLET1_R), FILLET1_R, 90, 90)
            Line((0, -FILLET1_R), (0, 0))
            Line((0, 0), (FILLET1_R, 0))
        make_face()
    fillet1_piece_41a = extrude(amount=1.75, mode=Mode.PRIVATE)
    fillet1_piece_41a = split(fillet1_piece_41a, bisect_by=Plane(origin=(-9.659412365, 13.886802443, -5), z_dir=(0, 0, 1)), keep=Keep.TOP, mode=Mode.PRIVATE)
    with BuildSketch(Plane(origin=(-10.796214808, 14, -5), x_dir=(0, -1, 0), z_dir=(1, 0, 0))) as fillet1_piece_41b_section:
        with BuildLine():
            CenterArc((FILLET1_R, -FILLET1_R), FILLET1_R, 90, 90)
            Line((0, -FILLET1_R), (0, 0))
            Line((0, 0), (FILLET1_R, 0))
        make_face()
    fillet1_piece_41b = extrude(amount=4.646214808, mode=Mode.PRIVATE)
    fillet1_piece_41b = split(fillet1_piece_41b, bisect_by=Plane(origin=(-9.546214808, 13.886802443, -4.886802443), z_dir=(-1, 0, 0)), keep=Keep.TOP, mode=Mode.PRIVATE)
    fillet1_piece_41 = fillet1_piece_41a & fillet1_piece_41b
    add(fillet1_piece_41, mode=Mode.SUBTRACT)

    # CSK for M5 Flat Head Machine Screw1 (through all)
    with Locations(Plane(origin=(10, 14, -1.5), x_dir=(0, 0, 1), z_dir=(0, 1, 0))):
        with Locations((0, 0), (0, -21)):
            CounterSinkHole(CSK_FOR_M5_FLAT_HEAD_MACHINE_SCREW1_D / 2, CSK_FOR_M5_FLAT_HEAD_MACHINE_SCREW1_CSINK_D / 2, counter_sink_angle=CSK_FOR_M5_FLAT_HEAD_MACHINE_SCREW1_CSINK_ANGLE)


solid = part.part
